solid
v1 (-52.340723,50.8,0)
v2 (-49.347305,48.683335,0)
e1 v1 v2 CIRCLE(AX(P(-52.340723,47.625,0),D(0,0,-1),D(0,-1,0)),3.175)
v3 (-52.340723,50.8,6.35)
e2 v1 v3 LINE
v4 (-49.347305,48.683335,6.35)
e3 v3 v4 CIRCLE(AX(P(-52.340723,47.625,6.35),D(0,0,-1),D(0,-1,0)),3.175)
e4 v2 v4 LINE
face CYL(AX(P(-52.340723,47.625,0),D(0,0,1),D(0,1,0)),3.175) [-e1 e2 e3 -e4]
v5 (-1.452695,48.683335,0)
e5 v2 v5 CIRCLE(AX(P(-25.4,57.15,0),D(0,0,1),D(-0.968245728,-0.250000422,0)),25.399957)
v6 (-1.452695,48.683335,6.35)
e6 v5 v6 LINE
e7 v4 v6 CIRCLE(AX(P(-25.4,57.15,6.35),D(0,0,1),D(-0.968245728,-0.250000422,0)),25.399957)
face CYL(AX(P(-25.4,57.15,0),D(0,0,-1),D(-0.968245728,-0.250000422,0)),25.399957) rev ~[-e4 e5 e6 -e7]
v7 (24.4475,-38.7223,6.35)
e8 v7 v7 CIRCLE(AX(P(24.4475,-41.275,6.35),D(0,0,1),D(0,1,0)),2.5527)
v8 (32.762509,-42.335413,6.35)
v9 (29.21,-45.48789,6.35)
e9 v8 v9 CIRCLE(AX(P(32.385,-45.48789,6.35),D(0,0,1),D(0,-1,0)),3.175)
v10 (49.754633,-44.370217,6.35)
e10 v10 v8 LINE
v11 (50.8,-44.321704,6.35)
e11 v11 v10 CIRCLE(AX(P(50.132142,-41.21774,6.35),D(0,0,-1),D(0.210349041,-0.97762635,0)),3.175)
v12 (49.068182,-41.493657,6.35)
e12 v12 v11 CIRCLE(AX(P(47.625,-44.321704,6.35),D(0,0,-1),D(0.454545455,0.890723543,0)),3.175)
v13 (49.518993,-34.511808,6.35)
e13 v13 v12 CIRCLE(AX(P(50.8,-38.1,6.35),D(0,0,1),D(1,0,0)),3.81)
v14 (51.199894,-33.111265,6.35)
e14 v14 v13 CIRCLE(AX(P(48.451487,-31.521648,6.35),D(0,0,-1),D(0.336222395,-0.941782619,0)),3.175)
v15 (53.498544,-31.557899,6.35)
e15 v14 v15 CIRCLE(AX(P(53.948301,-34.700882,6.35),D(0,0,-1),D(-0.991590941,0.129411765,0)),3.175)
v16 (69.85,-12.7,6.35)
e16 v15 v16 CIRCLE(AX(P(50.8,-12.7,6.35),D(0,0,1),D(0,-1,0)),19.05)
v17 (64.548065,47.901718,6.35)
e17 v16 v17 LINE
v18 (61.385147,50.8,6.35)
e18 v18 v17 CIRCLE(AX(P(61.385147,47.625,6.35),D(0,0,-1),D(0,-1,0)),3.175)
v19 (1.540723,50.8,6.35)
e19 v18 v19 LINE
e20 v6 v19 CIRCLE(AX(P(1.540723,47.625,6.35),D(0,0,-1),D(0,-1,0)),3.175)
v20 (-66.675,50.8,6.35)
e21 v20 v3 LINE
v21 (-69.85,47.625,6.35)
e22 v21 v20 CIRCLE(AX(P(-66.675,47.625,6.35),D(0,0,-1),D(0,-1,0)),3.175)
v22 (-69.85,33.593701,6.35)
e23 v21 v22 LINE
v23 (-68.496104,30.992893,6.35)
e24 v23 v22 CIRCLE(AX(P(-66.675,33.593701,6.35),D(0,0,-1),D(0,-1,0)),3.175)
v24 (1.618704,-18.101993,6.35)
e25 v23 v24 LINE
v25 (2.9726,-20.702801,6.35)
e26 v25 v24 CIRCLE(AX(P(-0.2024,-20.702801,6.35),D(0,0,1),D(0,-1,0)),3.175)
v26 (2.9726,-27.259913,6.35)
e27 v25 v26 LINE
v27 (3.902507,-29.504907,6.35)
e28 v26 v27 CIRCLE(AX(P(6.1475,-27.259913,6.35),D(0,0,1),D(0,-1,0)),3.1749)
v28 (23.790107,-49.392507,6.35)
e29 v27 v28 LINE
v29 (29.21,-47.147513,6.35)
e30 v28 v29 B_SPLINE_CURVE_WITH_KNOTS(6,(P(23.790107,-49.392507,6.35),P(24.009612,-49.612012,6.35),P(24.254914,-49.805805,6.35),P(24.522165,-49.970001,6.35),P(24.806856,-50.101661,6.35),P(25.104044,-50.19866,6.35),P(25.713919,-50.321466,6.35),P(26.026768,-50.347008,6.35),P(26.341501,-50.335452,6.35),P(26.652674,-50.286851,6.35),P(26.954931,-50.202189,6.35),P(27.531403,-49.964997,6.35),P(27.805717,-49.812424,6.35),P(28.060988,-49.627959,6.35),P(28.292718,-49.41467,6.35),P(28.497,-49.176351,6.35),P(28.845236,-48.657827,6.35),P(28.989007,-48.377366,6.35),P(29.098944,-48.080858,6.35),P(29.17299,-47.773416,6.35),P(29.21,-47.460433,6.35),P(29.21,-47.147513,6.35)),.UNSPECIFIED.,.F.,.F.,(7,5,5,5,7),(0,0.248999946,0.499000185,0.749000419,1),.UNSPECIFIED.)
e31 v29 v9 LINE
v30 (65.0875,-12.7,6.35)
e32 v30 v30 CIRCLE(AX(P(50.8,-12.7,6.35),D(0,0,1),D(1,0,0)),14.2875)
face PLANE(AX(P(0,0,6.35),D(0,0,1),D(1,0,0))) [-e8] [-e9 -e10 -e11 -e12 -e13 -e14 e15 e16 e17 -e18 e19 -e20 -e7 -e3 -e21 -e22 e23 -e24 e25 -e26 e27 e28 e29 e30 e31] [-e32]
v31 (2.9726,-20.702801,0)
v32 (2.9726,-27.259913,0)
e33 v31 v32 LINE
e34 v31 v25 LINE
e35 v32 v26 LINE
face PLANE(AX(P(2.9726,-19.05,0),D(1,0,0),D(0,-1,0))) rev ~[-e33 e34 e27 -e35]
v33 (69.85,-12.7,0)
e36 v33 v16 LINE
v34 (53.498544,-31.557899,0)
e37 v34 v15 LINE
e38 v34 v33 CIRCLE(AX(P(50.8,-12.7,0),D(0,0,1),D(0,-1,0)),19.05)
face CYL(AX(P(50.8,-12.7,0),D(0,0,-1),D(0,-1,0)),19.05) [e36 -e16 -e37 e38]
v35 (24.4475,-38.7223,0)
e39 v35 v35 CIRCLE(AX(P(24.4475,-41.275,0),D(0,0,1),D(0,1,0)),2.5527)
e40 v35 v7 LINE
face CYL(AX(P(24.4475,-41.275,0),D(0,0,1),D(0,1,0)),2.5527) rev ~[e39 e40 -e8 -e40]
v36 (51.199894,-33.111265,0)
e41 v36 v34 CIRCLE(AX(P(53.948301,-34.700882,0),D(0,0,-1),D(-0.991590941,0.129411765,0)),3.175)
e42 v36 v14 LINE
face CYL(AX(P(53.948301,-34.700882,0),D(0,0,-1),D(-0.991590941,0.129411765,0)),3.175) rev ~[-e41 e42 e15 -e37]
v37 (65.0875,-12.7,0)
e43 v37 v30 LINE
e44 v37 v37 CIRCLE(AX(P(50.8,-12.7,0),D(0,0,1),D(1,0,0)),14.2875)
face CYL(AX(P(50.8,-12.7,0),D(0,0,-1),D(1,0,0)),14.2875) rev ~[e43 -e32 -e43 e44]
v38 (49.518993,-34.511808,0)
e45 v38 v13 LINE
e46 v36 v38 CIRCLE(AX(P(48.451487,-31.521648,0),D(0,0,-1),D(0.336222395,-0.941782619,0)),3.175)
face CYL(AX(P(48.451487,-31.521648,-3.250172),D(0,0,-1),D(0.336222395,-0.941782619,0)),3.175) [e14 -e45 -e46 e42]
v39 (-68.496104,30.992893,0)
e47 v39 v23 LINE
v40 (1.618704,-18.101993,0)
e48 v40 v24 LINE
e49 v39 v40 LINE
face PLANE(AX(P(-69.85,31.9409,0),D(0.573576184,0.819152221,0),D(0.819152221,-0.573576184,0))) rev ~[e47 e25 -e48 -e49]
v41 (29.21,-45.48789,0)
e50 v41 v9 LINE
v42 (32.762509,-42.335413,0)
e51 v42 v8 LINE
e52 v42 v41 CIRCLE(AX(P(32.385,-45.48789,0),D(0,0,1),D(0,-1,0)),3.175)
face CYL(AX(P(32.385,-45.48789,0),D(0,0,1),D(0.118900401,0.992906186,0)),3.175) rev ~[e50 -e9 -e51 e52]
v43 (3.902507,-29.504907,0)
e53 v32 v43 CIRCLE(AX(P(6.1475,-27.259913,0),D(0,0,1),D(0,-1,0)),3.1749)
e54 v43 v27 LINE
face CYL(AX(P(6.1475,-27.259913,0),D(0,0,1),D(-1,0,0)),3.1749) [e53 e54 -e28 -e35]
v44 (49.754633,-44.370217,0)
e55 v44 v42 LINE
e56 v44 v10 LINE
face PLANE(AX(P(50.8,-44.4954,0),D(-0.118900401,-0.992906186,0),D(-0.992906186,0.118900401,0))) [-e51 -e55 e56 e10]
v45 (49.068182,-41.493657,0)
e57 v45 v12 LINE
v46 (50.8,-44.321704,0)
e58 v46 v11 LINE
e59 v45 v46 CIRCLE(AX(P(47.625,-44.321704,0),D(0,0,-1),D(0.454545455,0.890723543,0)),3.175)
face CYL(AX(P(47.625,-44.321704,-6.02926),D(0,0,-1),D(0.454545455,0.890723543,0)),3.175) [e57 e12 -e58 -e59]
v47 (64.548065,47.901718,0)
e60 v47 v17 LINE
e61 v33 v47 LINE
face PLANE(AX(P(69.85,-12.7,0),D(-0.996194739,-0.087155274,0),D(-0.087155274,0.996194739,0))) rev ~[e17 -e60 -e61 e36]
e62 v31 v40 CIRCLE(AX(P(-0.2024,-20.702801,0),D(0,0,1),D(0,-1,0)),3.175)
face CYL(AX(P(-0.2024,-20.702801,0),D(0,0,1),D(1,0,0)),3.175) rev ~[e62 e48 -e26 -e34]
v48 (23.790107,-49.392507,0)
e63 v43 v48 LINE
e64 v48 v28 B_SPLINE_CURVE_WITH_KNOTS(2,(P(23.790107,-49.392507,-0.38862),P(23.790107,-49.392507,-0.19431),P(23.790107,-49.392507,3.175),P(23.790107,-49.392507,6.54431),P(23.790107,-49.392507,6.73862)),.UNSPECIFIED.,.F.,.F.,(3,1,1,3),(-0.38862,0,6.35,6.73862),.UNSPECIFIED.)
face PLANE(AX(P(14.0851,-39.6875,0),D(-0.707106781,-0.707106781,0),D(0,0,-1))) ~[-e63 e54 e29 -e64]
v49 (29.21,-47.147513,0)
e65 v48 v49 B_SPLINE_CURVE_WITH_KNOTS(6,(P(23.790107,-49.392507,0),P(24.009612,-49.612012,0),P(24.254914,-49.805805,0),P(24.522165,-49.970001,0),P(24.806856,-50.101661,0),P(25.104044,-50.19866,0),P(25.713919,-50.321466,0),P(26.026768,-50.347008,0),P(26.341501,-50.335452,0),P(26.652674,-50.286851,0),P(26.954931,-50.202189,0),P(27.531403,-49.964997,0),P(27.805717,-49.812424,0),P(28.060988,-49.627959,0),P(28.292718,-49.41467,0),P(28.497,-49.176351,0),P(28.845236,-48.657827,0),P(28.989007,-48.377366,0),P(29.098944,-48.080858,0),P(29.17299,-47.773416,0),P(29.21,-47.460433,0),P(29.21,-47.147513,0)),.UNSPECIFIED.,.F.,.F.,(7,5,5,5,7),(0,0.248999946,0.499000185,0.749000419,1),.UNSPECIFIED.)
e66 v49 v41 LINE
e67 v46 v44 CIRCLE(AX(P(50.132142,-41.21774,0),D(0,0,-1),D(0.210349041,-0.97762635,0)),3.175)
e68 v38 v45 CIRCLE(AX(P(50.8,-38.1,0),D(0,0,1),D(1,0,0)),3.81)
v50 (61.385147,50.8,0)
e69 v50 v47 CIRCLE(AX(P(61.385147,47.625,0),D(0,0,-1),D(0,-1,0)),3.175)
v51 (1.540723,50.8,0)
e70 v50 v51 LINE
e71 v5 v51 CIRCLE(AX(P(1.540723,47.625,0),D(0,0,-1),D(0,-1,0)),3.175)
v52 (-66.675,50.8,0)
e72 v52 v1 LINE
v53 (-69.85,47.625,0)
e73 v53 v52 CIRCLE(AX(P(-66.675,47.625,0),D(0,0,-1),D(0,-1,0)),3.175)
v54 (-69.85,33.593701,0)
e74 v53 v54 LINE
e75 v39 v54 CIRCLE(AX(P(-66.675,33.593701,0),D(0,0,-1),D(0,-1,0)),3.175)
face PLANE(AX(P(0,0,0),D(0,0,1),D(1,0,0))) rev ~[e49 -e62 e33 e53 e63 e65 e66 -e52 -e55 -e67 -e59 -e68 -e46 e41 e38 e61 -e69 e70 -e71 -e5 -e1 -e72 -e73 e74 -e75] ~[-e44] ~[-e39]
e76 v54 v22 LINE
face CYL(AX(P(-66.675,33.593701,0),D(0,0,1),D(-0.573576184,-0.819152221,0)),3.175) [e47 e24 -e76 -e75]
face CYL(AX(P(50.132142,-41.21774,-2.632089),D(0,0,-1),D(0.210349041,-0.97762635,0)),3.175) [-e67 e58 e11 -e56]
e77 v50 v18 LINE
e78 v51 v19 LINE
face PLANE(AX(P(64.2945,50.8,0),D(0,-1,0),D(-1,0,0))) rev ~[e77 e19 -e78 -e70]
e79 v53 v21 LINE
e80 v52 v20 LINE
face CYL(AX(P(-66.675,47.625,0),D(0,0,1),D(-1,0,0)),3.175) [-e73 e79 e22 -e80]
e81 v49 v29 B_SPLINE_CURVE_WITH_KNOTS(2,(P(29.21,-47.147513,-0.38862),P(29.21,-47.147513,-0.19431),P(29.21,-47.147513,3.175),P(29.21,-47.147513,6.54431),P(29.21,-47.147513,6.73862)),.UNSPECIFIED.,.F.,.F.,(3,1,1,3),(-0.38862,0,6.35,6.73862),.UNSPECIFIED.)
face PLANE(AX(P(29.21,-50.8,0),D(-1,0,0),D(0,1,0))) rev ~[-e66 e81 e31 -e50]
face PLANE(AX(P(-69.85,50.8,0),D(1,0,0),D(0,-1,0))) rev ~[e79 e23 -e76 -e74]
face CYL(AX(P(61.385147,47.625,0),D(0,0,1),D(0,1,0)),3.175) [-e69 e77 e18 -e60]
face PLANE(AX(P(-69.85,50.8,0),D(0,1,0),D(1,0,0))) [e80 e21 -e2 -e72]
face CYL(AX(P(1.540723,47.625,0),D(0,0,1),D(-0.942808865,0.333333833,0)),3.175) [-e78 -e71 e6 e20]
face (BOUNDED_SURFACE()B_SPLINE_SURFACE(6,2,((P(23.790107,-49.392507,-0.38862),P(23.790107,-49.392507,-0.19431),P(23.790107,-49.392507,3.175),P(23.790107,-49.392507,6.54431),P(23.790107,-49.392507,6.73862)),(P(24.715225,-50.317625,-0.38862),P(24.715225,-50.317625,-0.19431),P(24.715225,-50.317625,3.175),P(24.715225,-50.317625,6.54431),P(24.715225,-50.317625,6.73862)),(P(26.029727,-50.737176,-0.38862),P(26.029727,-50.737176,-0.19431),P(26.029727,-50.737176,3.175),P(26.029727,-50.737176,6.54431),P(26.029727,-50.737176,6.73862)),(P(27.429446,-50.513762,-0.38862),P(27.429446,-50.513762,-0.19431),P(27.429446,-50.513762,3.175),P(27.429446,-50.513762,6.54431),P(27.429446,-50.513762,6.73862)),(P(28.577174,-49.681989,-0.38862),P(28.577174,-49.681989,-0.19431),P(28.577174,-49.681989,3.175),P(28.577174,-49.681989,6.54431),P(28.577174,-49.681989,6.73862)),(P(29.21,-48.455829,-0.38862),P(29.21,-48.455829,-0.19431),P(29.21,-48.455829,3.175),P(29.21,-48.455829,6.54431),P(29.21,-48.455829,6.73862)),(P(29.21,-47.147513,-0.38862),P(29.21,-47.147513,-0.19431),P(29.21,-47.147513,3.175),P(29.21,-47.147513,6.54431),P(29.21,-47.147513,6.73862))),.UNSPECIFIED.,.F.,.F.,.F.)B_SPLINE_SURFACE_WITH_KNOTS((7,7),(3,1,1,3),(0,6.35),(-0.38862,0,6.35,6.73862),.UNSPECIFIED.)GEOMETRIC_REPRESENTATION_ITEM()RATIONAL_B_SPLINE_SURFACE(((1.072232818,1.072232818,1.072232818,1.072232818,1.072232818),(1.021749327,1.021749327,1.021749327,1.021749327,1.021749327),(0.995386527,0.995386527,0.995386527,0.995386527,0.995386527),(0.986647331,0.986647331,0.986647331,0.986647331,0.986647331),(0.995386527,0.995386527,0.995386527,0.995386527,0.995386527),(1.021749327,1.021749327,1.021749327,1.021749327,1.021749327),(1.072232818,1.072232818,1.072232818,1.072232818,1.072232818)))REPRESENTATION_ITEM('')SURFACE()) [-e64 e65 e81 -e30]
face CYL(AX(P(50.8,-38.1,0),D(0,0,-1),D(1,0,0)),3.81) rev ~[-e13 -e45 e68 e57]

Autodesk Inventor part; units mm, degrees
ref_plane "YZ Plane" through (0, 0, 0) normal (1, 0, 0) x (0, 1, 0)
ref_plane "XZ Plane" through (0, 0, 0) normal (0, 1, 0) x (-1, 0, 0)
ref_plane "XY Plane" through (0, 0, 0) normal (0, 0, 1) x (1, 0, 0)
sketch "Sketch1" plane through (0, 0, 0) normal (0, 0, 1) x (1, 0, 0)
  line L0 (-69.85, -50.8) -> (69.85, -50.8) construction
  line L1 (69.85, -50.8) -> (69.85, 50.8) construction
  line L2 (69.85, 50.8) -> (-69.85, 50.8) construction
  line L3 (-69.85, 50.8) -> (-69.85, -50.8) construction
  line L4 (-69.85, -50.8) -> (69.85, 50.8) construction
  line L5 (69.85, -50.8) -> (-69.85, 50.8) construction
  circle A0 centre (-25.4, 57.15) radius 25.4 construction
  circle A1 centre (50.8, -12.7) radius 14.2875 construction
  circle A2 centre (50.8, -12.7) radius 19.05 construction
  line L6 (-69.85, 31.9409) -> (2.9726, -19.05) construction
  line L7 (2.9726, -19.05) -> (2.9726, -50.8) construction
  line L8 (29.21, -50.8) -> (29.21, -41.91) construction
  line L9 (29.21, -41.91) -> (50.8, -38.1) construction
  line L10 (50.8, -38.1) -> (50.8, -31.75) construction
  line L11 (69.85, -12.7) -> (64.2945, 50.8) construction
  line L12 (2.9726, -50.8) -> (29.21, -50.8)
  line L13 (29.21, -50.8) -> (29.21, -41.91)
  line L14 (50.8, -38.1) -> (50.8, -31.75)
  line L15 (69.85, -12.7) -> (64.2945, 50.8)
  line L16 (64.2945, 50.8) -> (-0.8066, 50.8)
  line L17 (-69.85, 50.8) -> (-49.9934, 50.8)
  line L18 (-69.85, 50.8) -> (-69.85, 31.9409)
  line L19 (-69.85, 31.9409) -> (2.9726, -19.05)
  line L20 (2.9726, -19.05) -> (2.9726, -50.8)
  circle A3 centre (50.8, -12.7) radius 14.2875
  arc A4 (-49.9934, 50.8) -> (-0.8066, 50.8) centre (-25.4, 57.15) ccw
  circle A5 centre (50.8, -38.1) radius 3.81
  arc A6 (50.8, -31.75) -> (69.85, -12.7) centre (50.8, -12.7) ccw
  line L21 (50.8, -38.1) -> (50.8, -44.4954)
  line L22 (50.8, -44.4954) -> (29.21, -41.91)
  circle A7 centre (24.4475, -41.275) radius 4.7625 construction
  point P0 (0, 0)
  point P1 (50.8, -34.29)
  point P2 (50.8, -41.91)
  dimension "d0" = 101.6
  dimension "d1" = 139.7
  dimension "d3" = 50.8
  dimension "d4" = 6.35
  dimension "d6" = 19.05
  dimension "d7" = 38.1
  dimension "d8" = 38.1
  dimension "d9" = 28.575
  dimension "d10" = 125
  dimension "d11" = 31.75
  dimension "d12" = 88.9
  dimension "d15" = 8.89
  dimension "d18" = 95
  dimension "d25" = 7.62
  dimension "d26" = 25.4
  dimension "d28" = 4.7625
  dimension "d31" = 6.35
  dimension "d33" = 21.59
  dimension "d38" = 76.2
  dimension "d40" = 9.525
  dimension "d49" = 9.525
extrude "Extrusion1" add sketch "Sketch1" along normal blind 6.35 contours L20 L19 L18 L17 A4 L16 L15 A6 L14 A5 L21 L22 L13 L12
fillet "Fillet1" radius 3.175 8 edges at (29.21, -50.8, 3.175) (29.21, -41.91, 3.175) (64.2945, 50.8, 3.175) (-0.8066, 50.8, 3.175) (-49.9934, 50.8, 3.175) (-69.85, 50.8, 3.175) (-69.85, 31.9409, 3.175) (2.9726, -19.05, 3.175)
chamfer "Chamfer1" distance 22.225 angle 45 1 edges at (2.9726, -50.8, 3.175)
fillet "Fillet3" radius 3.175 2 edges at (2.9726, -28.575, 3.175) (25.1976, -50.8, 3.175)
fillet "Fillet4" radius 3.175 4 edges at (50.8, -31.75, 3.175) (50.8, -34.29, 3.175) (50.8, -41.91, 3.175) (50.8, -44.4954, 3.175)
hole "Hole1" at (50.8, -12.7, 0) at (24.4475, -41.275, 0) direction (0, 0, 1) diameter 5.1054 end through all clearance for "Flat Head Machine Screw (82)" size "#10" standard "Ansi Unified Screw Threads"
properties part number "CL1-002" material "Aluminum 6061"
